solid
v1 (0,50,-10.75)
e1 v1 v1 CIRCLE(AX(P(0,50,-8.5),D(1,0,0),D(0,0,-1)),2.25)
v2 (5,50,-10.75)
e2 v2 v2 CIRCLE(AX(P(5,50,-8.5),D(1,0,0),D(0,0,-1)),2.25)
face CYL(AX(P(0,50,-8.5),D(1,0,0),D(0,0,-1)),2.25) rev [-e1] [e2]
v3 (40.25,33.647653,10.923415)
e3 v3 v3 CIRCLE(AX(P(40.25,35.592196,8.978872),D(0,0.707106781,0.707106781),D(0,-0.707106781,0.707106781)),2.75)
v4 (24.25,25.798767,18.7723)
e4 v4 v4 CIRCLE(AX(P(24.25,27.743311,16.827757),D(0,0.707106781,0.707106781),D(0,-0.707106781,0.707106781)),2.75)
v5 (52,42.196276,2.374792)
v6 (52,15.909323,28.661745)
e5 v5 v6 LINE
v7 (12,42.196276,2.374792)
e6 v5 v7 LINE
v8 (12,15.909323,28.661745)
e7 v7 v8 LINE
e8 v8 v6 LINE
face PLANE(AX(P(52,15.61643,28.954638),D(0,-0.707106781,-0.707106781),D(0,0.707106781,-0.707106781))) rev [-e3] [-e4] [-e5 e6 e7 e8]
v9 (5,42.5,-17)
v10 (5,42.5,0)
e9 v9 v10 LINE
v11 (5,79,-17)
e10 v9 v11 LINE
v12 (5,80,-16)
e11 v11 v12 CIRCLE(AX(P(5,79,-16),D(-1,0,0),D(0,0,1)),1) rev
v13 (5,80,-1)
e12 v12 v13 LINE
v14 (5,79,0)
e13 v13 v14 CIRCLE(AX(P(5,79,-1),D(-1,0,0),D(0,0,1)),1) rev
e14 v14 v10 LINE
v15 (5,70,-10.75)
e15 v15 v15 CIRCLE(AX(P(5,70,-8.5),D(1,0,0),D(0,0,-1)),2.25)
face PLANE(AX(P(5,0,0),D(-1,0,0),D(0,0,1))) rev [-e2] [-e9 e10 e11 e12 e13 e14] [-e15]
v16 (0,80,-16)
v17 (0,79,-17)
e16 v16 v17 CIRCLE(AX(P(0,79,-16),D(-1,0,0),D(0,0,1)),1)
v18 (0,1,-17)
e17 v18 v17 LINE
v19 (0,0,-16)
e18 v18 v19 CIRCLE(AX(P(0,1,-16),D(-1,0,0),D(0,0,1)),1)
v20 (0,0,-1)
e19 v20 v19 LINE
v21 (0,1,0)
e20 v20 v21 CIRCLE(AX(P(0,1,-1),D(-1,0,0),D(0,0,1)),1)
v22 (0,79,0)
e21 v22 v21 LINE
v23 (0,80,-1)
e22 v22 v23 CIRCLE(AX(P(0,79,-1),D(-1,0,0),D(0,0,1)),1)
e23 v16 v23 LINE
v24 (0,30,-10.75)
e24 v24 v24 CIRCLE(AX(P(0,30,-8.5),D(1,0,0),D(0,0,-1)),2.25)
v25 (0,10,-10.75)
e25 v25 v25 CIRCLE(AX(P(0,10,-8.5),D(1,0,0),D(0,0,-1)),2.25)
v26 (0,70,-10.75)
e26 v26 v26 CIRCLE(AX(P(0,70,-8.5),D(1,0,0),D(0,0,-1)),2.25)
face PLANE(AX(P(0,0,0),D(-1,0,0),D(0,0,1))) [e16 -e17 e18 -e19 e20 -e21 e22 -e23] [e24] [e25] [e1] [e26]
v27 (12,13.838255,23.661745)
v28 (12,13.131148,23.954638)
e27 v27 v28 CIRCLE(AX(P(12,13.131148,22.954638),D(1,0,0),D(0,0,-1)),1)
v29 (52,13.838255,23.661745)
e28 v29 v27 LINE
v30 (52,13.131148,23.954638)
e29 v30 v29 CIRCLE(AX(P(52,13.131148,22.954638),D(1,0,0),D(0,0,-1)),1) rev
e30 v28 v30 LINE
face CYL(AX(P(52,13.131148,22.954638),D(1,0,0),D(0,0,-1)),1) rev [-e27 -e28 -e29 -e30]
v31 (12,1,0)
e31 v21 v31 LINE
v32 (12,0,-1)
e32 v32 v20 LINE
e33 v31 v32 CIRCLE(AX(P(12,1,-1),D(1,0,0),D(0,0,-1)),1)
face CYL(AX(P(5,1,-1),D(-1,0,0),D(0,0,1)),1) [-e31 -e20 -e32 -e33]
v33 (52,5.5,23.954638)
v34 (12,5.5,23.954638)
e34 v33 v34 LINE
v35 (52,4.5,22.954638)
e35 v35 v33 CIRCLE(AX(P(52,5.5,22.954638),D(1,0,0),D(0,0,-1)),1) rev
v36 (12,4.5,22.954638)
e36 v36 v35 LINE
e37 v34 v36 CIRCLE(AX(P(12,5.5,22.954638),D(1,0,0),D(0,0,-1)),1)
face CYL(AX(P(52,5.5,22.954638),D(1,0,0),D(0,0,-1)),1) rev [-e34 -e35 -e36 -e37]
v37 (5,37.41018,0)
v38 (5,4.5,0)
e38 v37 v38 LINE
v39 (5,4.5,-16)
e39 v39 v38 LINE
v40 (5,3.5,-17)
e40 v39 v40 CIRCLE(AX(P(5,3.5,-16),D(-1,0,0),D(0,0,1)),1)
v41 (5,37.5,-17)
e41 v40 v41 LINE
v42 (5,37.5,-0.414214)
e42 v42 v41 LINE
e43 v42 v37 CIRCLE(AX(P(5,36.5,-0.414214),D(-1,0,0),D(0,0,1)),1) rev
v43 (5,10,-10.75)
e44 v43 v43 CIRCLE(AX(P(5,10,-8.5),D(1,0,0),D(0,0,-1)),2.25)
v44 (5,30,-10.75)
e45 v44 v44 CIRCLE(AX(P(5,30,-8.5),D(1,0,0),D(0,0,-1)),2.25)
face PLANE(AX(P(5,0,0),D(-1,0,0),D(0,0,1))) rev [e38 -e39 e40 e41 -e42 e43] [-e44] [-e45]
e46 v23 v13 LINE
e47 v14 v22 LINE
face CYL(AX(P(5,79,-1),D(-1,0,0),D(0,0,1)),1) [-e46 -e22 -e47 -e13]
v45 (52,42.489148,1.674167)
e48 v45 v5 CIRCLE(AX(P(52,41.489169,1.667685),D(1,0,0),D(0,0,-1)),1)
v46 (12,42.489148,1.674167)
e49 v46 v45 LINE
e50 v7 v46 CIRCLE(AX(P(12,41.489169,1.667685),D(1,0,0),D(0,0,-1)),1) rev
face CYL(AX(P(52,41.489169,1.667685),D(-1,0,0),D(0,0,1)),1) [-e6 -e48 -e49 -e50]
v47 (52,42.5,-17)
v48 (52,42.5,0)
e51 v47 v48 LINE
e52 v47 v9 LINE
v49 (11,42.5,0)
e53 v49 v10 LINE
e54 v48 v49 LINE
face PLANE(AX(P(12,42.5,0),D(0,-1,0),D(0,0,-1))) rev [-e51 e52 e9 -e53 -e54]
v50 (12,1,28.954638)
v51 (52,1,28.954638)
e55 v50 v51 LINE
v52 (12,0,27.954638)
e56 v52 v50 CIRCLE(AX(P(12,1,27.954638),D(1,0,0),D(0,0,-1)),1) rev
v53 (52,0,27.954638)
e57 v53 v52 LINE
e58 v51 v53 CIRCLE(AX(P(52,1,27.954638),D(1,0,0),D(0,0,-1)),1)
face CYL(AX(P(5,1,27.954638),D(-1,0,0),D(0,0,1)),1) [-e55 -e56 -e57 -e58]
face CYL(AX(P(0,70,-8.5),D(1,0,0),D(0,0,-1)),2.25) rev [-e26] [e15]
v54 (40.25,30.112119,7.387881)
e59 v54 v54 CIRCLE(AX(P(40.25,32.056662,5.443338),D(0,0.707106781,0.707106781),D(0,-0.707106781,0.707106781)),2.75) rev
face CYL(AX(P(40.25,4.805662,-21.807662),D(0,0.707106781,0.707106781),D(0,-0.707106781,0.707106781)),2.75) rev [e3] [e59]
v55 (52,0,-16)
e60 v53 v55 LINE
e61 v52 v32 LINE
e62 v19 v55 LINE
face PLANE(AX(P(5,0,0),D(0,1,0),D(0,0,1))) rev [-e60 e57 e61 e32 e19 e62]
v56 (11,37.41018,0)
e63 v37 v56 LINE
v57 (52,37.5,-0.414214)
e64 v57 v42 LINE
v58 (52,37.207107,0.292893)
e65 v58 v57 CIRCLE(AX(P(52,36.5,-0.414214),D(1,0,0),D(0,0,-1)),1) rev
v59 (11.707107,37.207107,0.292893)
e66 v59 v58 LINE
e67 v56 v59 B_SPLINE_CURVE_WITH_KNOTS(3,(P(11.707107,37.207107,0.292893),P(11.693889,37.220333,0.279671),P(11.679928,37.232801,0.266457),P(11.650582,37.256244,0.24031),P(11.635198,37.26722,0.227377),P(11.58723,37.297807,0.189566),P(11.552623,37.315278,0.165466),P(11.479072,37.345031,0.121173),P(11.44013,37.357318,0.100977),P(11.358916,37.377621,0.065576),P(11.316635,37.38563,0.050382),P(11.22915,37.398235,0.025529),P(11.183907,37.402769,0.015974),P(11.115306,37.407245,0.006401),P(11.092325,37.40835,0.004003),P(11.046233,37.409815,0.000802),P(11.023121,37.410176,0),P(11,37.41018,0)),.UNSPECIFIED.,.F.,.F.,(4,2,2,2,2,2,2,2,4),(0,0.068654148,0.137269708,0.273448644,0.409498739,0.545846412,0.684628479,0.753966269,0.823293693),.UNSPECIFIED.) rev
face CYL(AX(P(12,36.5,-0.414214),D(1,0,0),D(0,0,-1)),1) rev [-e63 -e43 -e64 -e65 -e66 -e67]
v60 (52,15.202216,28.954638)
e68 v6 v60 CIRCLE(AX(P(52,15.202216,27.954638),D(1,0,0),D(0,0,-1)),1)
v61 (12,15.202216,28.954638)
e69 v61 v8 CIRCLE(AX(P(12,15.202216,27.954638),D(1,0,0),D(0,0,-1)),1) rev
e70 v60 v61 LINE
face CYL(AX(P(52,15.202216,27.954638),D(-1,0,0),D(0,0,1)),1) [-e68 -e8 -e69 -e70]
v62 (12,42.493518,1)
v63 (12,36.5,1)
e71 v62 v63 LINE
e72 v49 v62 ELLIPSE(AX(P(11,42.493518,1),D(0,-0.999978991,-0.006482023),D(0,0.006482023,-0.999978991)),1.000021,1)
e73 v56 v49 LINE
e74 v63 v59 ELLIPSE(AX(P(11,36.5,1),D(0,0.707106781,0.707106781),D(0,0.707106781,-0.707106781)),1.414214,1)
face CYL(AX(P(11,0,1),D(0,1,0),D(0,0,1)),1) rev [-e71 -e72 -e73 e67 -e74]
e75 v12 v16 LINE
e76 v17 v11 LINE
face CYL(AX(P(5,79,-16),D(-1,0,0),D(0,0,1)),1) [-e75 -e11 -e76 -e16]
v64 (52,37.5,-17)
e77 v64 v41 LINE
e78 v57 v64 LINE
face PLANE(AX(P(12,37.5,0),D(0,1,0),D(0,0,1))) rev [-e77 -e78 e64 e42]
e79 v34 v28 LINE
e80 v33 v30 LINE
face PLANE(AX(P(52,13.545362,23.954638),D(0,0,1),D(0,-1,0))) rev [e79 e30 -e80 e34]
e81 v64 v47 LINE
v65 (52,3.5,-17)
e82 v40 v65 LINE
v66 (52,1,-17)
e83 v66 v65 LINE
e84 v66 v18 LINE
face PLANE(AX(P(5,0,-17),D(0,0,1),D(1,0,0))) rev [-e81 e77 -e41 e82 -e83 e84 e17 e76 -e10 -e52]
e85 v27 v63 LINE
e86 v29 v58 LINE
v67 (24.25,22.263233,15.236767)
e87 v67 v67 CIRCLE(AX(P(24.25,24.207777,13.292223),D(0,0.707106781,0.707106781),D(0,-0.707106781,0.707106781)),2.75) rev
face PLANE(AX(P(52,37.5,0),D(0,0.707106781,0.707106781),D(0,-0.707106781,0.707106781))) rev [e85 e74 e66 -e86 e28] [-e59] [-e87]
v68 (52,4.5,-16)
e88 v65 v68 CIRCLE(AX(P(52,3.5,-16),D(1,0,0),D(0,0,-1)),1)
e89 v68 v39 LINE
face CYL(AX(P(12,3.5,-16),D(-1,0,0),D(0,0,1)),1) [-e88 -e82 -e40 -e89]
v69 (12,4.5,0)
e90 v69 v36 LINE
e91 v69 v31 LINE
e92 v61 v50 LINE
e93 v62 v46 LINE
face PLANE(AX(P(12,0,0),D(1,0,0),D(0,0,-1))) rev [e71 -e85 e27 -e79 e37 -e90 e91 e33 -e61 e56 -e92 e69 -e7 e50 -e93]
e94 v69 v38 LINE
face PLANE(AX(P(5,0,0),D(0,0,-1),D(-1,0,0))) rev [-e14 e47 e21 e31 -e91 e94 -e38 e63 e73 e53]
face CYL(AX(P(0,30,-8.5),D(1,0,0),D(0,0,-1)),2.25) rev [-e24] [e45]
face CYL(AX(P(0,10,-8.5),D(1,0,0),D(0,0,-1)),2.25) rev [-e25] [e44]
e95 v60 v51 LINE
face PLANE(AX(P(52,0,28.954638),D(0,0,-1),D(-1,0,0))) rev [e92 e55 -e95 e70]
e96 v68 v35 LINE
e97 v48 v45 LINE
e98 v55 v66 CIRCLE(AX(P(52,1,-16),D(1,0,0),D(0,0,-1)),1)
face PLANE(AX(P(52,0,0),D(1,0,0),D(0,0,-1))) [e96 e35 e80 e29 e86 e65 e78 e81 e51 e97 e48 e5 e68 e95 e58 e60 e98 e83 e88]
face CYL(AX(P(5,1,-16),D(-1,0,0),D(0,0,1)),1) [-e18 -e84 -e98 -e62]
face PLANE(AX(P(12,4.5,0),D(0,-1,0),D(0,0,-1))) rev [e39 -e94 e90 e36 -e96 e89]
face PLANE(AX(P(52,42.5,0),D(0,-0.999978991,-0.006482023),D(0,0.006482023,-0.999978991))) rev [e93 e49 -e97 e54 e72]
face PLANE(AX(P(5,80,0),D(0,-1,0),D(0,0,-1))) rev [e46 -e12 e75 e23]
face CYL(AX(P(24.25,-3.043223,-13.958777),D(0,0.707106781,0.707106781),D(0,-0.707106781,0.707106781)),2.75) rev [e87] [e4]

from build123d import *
from build123d.topology import SkipClean

# Parameters (mm, degrees)
SKETCH1_W           = 17
SKETCH1_H           = 80
BOSS_EXTRUDE1_DEPTH = 5
SKETCH2_R           = 2.25
CUT_EXTRUDE1_DEPTH  = 82.939001702
SKETCH3_W           = 17
SKETCH3_H           = 5
SKETCH3_H_2         = 4.5
BOSS_EXTRUDE2_DEPTH = 7
BOSS_EXTRUDE3_DEPTH = 40
CUT_EXTRUDE2_REACH  = 89.054
SKETCH6_R           = 2.75
FILLET1_START       = 5
FILLET1_DEPTH       = 48
FILLET1_START_2     = -1
FILLET1_2_DEPTH     = 13
FILLET1_START_3     = 10.9999999
FILLET1_3_DEPTH     = 4.7752001
FILLET1_START_4     = 12
FILLET1_4_DEPTH     = 40
FILLET1_5_DEPTH     = 12
FILLET1_6_DEPTH     = 43.5
FILLET1_7_DEPTH     = 16.909322952


with BuildPart() as part:
    # Sketch1 → Boss-Extrude1 (new body)
    with BuildSketch(Plane(origin=(0, 0, 0), x_dir=(0, 0, -1), z_dir=(1, 0, 0))):
        with Locations((8.5, 40)):
            Rectangle(SKETCH1_W, SKETCH1_H)
    extrude(amount=BOSS_EXTRUDE1_DEPTH)

    # Sketch2 → Cut-Extrude1 (cut, through all)
    with BuildSketch(Plane(origin=(5, 0, 0), x_dir=(0, 0, -1), z_dir=(1, 0, 0))):
        with Locations((8.5, 10)):
            Circle(SKETCH2_R)
        with Locations((8.5, 30)):
            Circle(SKETCH2_R)
        with Locations((8.5, 50)):
            Circle(SKETCH2_R)
        with Locations((8.5, 70)):
            Circle(SKETCH2_R)
    extrude(amount=-CUT_EXTRUDE1_DEPTH, mode=Mode.SUBTRACT)

    # Sketch3 → Boss-Extrude2 (add)
    with BuildSketch(Plane(origin=(5, 0, 0), x_dir=(0, 0, -1), z_dir=(1, 0, 0))):
        with Locations((8.5, 40)):
            Rectangle(SKETCH3_W, SKETCH3_H)
        with Locations((8.5, 2.25)):
            Rectangle(SKETCH3_W, SKETCH3_H_2)
    extrude(amount=BOSS_EXTRUDE2_DEPTH)

    # Sketch5 → Boss-Extrude3 (add)
    with BuildSketch(Plane(origin=(12, 0, 0), x_dir=(0, 0, -1), z_dir=(1, 0, 0))):
        Polygon((0, 37.5), (-23.954638078, 13.545361922), (-23.954638078, 4.5), (17, 4.5), (17, 0), (-28.954638078, 0), (-28.954638078, 5), (-28.954638078, 15.616429734), (-2.084580393, 42.486487419), (0, 42.5), (17, 42.5), (17, 37.5), align=None)
    extrude(amount=BOSS_EXTRUDE3_DEPTH)

    # Sketch6 → Cut-Extrude2 (cut, up to next)
    with BuildSketch(Plane(origin=(0, 22.285533906, 22.285533906), x_dir=(1, 0, 0), z_dir=(0, 0.7071067811865482, 0.7071067811865468)), mode=Mode.PRIVATE) as cut_extrude2_sk1:
        with Locations(Location((40.25, 18.818462431, 0), (0, 0, 270))):
            Circle(SKETCH6_R)
    cut_extrude2_tool1 = extrude(cut_extrude2_sk1.sketch, amount=-CUT_EXTRUDE2_REACH, mode=Mode.PRIVATE) & part.part
    # Sketch6 → Cut-Extrude2 (cut, up to next)
    with BuildSketch(Plane(origin=(0, 22.285533906, 22.285533906), x_dir=(1, 0, 0), z_dir=(0, 0.7071067811865482, 0.7071067811865468)), mode=Mode.PRIVATE) as cut_extrude2_sk2:
        with Locations(Location((24.25, 7.718462431, 0), (0, 0, 270))):
            Circle(SKETCH6_R)
    cut_extrude2_tool2 = extrude(cut_extrude2_sk2.sketch, amount=-CUT_EXTRUDE2_REACH, mode=Mode.PRIVATE) & part.part
    add(cut_extrude2_tool1.solids().sort_by_distance((40.25, 35.592196, 8.978872))[0], mode=Mode.SUBTRACT)
    add(cut_extrude2_tool2.solids().sort_by_distance((24.25, 27.743311, 16.827757))[0], mode=Mode.SUBTRACT)

    # Fillet1: read off the stored shape, not the designer's step
    # Fillet1 outline → Fillet1 (cut)
    with BuildSketch(Plane.YZ.offset(FILLET1_START)):
        with BuildLine():
            Line((4.5, -17), (4.5, -16))
            ThreePointArc((4.5, -16), (4.207106781, -16.707106781), (3.5, -17))
            Line((3.5, -17), (4.5, -17))
        make_face()
        with BuildLine():
            Line((0, -17), (1, -17))
            ThreePointArc((1, -17), (0.292893219, -16.707106781), (0, -16))
            Line((0, -16), (0, -17))
        make_face()
        with BuildLine():
            Line((0, 28.954638078), (0, 27.954638078))
            ThreePointArc((0, 27.954638078), (0.292893219, 28.661744859), (1, 28.954638078))
            Line((1, 28.954638078), (0, 28.954638078))
        make_face()
        with BuildLine():
            ThreePointArc((42.19627557, 2.374792242), (42.411803181, 2.053361203), (42.48914778, 1.674167483))
            Line((42.48914778, 1.674167483), (42.486487419, 2.084580393))
            Line((42.486487419, 2.084580393), (42.19627557, 2.374792242))
        make_face()
        with BuildLine():
            Line((15.616429734, 28.954638078), (15.202216171, 28.954638078))
            ThreePointArc((15.202216171, 28.954638078), (15.584899604, 28.878517611), (15.909322952, 28.661744859))
            Line((15.909322952, 28.661744859), (15.616429734, 28.954638078))
        make_face()
    extrude(amount=FILLET1_DEPTH, mode=Mode.SUBTRACT)

    # Fillet1 2 outline → Fillet1 2 (cut)
    with BuildSketch(Plane.YZ.offset(FILLET1_START_2)):
        with BuildLine():
            Line((0, -17), (1, -17))
            ThreePointArc((1, -17), (0.292893219, -16.707106781), (0, -16))
            Line((0, -16), (0, -17))
        make_face()
        with BuildLine():
            ThreePointArc((0, -1), (0.292893219, -0.292893219), (1, 0))
            Line((1, 0), (0, 0))
            Line((0, 0), (0, -1))
        make_face()
        with BuildLine():
            ThreePointArc((80, -16), (79.707106781, -16.707106781), (79, -17))
            Line((79, -17), (80, -17))
            Line((80, -17), (80, -16))
        make_face()
        with BuildLine():
            Line((80, 0), (79, 0))
            ThreePointArc((79, 0), (79.707106781, -0.292893219), (80, -1))
            Line((80, -1), (80, 0))
        make_face()
    extrude(amount=FILLET1_2_DEPTH, mode=Mode.SUBTRACT)

    # Fillet1 3 outline → Fillet1 3 (add)
    with SkipClean():  # the faces are left unmerged after this step: merging them gives an invalid solid
        with BuildSketch(Plane.YZ.offset(FILLET1_START_3)):
            with BuildLine():
                Line((4.5, 0), (4.5, 23.954638078))
                Line((4.5, 23.954638078), (13.545361922, 23.954638078))
                Line((13.545361922, 23.954638078), (37.207106781, 0.292893219))
                ThreePointArc((37.207106781, 0.292893219), (37.423879533, -0.03153013), (37.5, -0.414213562))
                Line((37.5, -0.414213562), (37.5, 0))
                Line((37.5, 0), (42.5, 0))
                Line((42.5, 0), (42.48914778, 1.674167483))
                ThreePointArc((42.48914778, 1.674167483), (42.411803181, 2.053361203), (42.19627557, 2.374792242))
                Line((42.19627557, 2.374792242), (15.909322952, 28.661744859))
                ThreePointArc((15.909322952, 28.661744859), (15.584899604, 28.878517611), (15.202216171, 28.954638078))
                Line((15.202216171, 28.954638078), (1, 28.954638078))
                ThreePointArc((1, 28.954638078), (0.292893219, 28.661744859), (0, 27.954638078))
                Line((0, 27.954638078), (0, 0))
                Line((0, 0), (4.5, 0))
            make_face()
        extrude(amount=FILLET1_3_DEPTH)
    add(part.part.scale(1), mode=Mode.REPLACE)  # the faces are merged on a copy

    # Fillet1 4 outline → Fillet1 4 (add)
    with BuildSketch(Plane.YZ.offset(FILLET1_START_4)):
        with BuildLine():
            Line((37.5, -0.414213562), (37.5, 0))
            Line((37.5, 0), (37.207106781, 0.292893219))
            ThreePointArc((37.207106781, 0.292893219), (37.423879533, -0.03153013), (37.5, -0.414213562))
        make_face()
        with BuildLine():
            Line((4.5, 23.954638078), (4.5, 22.954638078))
            ThreePointArc((4.5, 22.954638078), (4.792893219, 23.661744859), (5.5, 23.954638078))
            Line((5.5, 23.954638078), (4.5, 23.954638078))
        make_face()
        with BuildLine():
            ThreePointArc((13.131148359, 23.954638078), (13.513831792, 23.878517611), (13.838255141, 23.661744859))
            Line((13.838255141, 23.661744859), (13.545361922, 23.954638078))
            Line((13.545361922, 23.954638078), (13.131148359, 23.954638078))
        make_face()
    extrude(amount=FILLET1_4_DEPTH)

    # Fillet1 5 outline → Fillet1 5 (add)
    with BuildSketch(Plane.YZ):
        with BuildLine():
            Line((37.5, 0), (37.410179722, 0))
            ThreePointArc((37.410179722, 0), (37.47728699, -0.202293437), (37.5, -0.414213562))
            Line((37.5, -0.414213562), (37.5, 0))
        make_face()
    extrude(amount=FILLET1_5_DEPTH)

    # Fillet1 6 outline → Fillet1 6 (cut)
    with BuildSketch(Plane(origin=(0, 0, 0), x_dir=(1, 0, 0), z_dir=(0, 1, 0)).offset(FILLET1_START_2)):
        with BuildLine():
            Line((10.9999999, -28.954638078), (12, -28.954638078))
            Line((12, -28.954638078), (12, -1))
            ThreePointArc((12, -1), (11.707106781, -0.292893219), (11, 0))
            Line((11, 0), (10.9999999, -28.954638078))
        make_face()
    extrude(amount=FILLET1_6_DEPTH, mode=Mode.SUBTRACT)

    # Fillet1 7 outline → Fillet1 7 (cut)
    with BuildSketch(Plane(origin=(0, 0, 0), x_dir=(1, 0, 0), z_dir=(0, 1, 0)).offset(FILLET1_START_2)):
        with BuildLine():
            Line((12, 0), (11, 0))
            ThreePointArc((11, 0), (11.707106781, -0.292893219), (12, -1))
            Line((12, -1), (12, 0))
        make_face()
    extrude(amount=FILLET1_7_DEPTH, mode=Mode.SUBTRACT)


solid = part.part
